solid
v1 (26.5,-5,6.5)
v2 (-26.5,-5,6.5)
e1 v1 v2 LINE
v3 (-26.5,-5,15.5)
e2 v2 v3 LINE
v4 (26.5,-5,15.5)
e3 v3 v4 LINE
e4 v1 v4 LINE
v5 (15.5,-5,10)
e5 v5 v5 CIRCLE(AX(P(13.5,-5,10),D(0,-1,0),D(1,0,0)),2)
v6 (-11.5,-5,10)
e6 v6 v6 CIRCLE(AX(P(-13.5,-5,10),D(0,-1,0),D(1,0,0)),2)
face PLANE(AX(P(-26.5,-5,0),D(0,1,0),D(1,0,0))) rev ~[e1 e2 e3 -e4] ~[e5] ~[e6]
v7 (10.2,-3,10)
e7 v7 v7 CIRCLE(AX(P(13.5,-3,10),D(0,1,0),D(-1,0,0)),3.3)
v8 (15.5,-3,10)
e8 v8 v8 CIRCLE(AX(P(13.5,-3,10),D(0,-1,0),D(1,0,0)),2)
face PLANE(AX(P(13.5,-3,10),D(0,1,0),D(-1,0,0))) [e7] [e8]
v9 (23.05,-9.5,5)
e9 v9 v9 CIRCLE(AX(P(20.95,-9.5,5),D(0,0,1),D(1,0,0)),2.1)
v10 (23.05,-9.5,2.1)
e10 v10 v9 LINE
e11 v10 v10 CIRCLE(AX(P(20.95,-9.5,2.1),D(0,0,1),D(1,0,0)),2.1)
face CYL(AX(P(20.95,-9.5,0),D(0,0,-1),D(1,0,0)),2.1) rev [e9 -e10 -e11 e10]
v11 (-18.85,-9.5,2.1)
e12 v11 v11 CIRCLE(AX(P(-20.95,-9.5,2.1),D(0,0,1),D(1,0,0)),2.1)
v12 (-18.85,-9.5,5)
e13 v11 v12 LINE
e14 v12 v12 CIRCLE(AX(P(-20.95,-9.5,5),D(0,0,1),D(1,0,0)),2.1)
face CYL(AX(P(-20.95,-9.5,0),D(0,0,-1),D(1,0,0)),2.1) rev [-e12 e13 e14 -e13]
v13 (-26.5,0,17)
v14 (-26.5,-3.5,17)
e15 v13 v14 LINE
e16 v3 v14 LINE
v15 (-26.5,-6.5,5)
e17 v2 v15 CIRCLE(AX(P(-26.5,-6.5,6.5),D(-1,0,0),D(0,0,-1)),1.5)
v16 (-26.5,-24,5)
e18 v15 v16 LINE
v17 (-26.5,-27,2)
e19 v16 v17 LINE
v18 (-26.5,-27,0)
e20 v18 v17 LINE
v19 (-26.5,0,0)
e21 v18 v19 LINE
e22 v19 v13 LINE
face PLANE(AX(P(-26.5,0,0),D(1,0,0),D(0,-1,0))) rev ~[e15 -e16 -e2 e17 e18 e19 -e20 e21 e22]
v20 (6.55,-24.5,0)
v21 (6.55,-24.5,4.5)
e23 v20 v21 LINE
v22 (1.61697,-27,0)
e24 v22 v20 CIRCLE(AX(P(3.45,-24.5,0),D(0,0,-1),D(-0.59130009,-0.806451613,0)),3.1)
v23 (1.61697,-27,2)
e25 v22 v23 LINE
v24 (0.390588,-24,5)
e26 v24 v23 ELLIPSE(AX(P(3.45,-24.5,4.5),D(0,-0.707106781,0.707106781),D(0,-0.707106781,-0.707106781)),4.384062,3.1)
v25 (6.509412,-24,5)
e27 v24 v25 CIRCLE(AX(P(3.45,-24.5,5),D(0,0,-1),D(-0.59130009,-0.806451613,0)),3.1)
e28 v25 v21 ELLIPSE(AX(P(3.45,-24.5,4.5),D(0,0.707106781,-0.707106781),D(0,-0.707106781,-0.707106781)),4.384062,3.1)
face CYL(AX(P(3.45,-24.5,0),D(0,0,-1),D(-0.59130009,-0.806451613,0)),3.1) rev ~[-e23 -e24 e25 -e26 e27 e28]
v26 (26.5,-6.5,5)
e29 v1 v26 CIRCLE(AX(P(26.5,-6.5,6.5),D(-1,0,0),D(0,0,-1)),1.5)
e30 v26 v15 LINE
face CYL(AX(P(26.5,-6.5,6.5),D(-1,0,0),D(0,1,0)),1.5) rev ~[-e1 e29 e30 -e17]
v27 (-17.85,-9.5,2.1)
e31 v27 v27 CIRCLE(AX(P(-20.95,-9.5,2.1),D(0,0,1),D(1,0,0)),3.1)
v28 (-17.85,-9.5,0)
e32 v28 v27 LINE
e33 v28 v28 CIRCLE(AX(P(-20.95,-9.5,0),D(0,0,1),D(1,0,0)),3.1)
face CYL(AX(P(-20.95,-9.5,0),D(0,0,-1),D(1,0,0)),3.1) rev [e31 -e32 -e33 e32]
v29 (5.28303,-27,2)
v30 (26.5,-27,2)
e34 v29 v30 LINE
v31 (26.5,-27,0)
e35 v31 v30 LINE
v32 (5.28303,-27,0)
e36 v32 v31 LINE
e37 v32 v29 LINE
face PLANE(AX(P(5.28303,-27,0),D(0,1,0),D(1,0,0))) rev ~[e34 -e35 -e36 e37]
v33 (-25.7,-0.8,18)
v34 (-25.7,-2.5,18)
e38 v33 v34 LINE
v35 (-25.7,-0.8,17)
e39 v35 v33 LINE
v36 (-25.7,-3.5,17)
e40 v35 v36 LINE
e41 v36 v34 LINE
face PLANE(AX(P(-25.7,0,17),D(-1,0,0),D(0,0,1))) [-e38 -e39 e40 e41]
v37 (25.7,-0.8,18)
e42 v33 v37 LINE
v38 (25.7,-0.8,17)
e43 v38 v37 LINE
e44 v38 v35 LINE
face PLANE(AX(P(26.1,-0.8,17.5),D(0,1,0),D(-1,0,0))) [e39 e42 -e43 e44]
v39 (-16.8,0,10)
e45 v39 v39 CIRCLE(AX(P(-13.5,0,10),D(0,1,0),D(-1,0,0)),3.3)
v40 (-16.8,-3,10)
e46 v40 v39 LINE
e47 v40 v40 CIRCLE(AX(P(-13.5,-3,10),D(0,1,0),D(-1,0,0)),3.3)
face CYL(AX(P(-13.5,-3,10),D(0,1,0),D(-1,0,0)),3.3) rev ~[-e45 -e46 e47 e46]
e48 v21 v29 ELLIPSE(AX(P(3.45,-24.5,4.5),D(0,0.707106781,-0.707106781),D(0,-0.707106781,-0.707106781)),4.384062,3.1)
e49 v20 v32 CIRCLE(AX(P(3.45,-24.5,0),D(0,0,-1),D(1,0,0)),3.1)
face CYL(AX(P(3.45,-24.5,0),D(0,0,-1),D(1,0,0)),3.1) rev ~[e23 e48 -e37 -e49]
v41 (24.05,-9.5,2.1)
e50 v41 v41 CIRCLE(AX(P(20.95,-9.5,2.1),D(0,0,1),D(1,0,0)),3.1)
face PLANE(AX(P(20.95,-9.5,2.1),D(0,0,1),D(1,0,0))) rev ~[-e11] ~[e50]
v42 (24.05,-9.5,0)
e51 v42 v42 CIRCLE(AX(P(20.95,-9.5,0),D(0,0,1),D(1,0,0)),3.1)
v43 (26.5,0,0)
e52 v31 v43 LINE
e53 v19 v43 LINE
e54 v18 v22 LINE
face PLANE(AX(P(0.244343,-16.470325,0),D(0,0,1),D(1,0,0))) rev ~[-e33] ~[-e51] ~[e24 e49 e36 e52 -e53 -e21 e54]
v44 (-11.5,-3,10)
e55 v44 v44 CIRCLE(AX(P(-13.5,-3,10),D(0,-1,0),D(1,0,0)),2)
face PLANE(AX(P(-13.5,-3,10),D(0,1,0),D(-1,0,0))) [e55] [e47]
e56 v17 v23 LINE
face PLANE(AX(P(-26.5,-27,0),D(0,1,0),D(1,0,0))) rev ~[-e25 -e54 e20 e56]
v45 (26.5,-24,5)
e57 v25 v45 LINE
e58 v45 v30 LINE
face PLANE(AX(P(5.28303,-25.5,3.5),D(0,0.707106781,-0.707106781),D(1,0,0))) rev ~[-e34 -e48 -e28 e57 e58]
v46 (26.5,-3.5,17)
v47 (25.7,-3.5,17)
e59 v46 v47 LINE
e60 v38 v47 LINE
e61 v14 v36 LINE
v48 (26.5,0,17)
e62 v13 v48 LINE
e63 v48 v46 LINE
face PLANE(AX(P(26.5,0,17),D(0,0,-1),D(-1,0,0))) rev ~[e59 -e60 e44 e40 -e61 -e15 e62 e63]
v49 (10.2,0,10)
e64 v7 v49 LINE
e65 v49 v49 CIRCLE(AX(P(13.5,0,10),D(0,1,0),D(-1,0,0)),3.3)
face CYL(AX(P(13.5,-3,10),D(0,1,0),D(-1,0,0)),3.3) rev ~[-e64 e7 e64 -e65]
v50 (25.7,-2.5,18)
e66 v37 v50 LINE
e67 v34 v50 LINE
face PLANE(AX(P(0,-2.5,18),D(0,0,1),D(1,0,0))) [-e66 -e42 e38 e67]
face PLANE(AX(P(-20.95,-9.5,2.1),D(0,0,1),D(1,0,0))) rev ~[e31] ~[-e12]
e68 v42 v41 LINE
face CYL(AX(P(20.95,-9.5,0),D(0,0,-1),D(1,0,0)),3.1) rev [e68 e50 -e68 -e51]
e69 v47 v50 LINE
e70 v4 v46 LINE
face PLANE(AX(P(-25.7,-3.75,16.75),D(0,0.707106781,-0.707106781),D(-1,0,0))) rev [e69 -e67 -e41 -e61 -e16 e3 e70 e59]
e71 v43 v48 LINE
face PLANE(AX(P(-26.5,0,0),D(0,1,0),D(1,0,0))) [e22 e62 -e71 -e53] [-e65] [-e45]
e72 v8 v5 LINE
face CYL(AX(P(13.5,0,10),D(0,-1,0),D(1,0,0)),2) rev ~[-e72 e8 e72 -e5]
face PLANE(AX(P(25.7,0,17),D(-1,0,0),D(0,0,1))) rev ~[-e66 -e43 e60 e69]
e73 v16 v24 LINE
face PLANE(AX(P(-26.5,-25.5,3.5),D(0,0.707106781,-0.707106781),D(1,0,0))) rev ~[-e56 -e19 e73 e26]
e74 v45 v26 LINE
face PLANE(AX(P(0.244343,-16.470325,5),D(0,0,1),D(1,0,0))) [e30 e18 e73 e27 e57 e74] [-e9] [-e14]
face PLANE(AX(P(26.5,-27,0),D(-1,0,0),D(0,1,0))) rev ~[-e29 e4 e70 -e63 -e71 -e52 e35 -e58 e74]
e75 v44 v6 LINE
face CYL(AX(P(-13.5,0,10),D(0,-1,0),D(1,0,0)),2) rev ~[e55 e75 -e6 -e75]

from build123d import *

# Parameters (mm, degrees)
F0_R           = 3.1
F0_W           = 53
F0_H           = 5
F0_R_2         = 2.1
F1_DEPTH       = 5
F2_DEPTH       = 2.1
F3_DEPTH       = 18
F4_W           = 0.8
F4_H           = 1
F4_W_2         = 51.4
F5_DEPTH       = 0.8
F6_DEPTH       = 25
F7_D           = 4
F7_CBORE_D     = 6.6
F7_CBORE_DEPTH = 3
F8_SIZE        = 2.5
F9_R           = 1.5
F10_SIZE       = 3


with BuildPart() as f1:
    # F0 (on Top) → F1 (new body)
    with BuildSketch(Plane.XY):
        with BuildLine():
            Line((26.5, -5), (-26.5, -5))
            Line((-26.5, -5), (-26.5, -27))
            Line((-26.5, -27), (1.616969722, -27))
            ThreePointArc((1.616969722, -27), (2.0486424192, -21.7348242496), (6.55, -24.5))
            ThreePointArc((6.55, -24.5), (6.2151757504, -25.9013575808), (5.283030278, -27))
            Line((5.283030278, -27), (26.5, -27))
            Line((26.5, -27), (26.5, -5))
        make_face()
        with Locations((-20.95, -9.5)):
            Circle(F0_R, mode=Mode.SUBTRACT)
        with Locations((20.95, -9.5)):
            Circle(F0_R, mode=Mode.SUBTRACT)
        with Locations((0, -2.5)):
            Rectangle(F0_W, F0_H)
        with Locations((-20.95, -9.5)):
            Circle(F0_R)
        with Locations((-20.95, -9.5)):
            Circle(F0_R_2, mode=Mode.SUBTRACT)
        with Locations((20.95, -9.5)):
            Circle(F0_R)
        with Locations((20.95, -9.5)):
            Circle(F0_R_2, mode=Mode.SUBTRACT)
    extrude(amount=F1_DEPTH)

    # F0 (on Top) → F2 (cut)
    with BuildSketch(Plane.XY):
        with Locations((20.95, -9.5)):
            Circle(F0_R)
        with Locations((20.95, -9.5)):
            Circle(F0_R_2, mode=Mode.SUBTRACT)
        with Locations((-20.95, -9.5)):
            Circle(F0_R)
        with Locations((-20.95, -9.5)):
            Circle(F0_R_2, mode=Mode.SUBTRACT)
    extrude(amount=F2_DEPTH, mode=Mode.SUBTRACT)

    # F0 (on Top) → F3 (join)
    with BuildSketch(Plane.XY):
        with Locations((0, -2.5)):
            Rectangle(F0_W, F0_H)
    extrude(amount=F3_DEPTH)

    # F4 (on face) → F5 (cut)
    with BuildSketch(Plane(origin=(0, 0, 0), x_dir=(-1, 0, 0), z_dir=(0, 1, 0))):
        with Locations((-26.1, 17.5)):
            Rectangle(F4_W, F4_H)
        with Locations((0, 17.5)):
            Rectangle(F4_W_2, F4_H)
        with Locations((26.1, 17.5)):
            Rectangle(F4_W, F4_H)
    extrude(amount=-F5_DEPTH, mode=Mode.SUBTRACT)

    # F4 (on face) → F6 (cut)
    with BuildSketch(Plane(origin=(0, 0, 0), x_dir=(-1, 0, 0), z_dir=(0, 1, 0))):
        with Locations((-26.1, 17.5)):
            Rectangle(F4_W, F4_H)
        with Locations((26.1, 17.5)):
            Rectangle(F4_W, F4_H)
    extrude(amount=-F6_DEPTH, mode=Mode.SUBTRACT)

    # F7 (through all)
    with Locations(Plane(origin=(0, 0, 0), x_dir=(-1, 0, 0), z_dir=(0, 1, 0))):
        with Locations((13.5, 10), (-13.5, 10)):
            CounterBoreHole(F7_D / 2, F7_CBORE_D / 2, F7_CBORE_DEPTH)

    # F8
    f8_edges = [f1.edges().sort_by_distance(p)[0] for p in [
        (0, -5, 18),
    ]]
    chamfer(f8_edges, length=F8_SIZE)

    # F9
    f9_edges = [f1.edges().sort_by_distance(p)[0] for p in [
        (0, -5, 5),
    ]]
    fillet(f9_edges, radius=F9_R)

    # F10
    f10_edges = [f1.edges().sort_by_distance(p)[0] for p in [
        (15.891515, -27, 5),
        (-12.441515, -27, 5),
    ]]
    chamfer(f10_edges, length=F10_SIZE)


solid = f1.part
